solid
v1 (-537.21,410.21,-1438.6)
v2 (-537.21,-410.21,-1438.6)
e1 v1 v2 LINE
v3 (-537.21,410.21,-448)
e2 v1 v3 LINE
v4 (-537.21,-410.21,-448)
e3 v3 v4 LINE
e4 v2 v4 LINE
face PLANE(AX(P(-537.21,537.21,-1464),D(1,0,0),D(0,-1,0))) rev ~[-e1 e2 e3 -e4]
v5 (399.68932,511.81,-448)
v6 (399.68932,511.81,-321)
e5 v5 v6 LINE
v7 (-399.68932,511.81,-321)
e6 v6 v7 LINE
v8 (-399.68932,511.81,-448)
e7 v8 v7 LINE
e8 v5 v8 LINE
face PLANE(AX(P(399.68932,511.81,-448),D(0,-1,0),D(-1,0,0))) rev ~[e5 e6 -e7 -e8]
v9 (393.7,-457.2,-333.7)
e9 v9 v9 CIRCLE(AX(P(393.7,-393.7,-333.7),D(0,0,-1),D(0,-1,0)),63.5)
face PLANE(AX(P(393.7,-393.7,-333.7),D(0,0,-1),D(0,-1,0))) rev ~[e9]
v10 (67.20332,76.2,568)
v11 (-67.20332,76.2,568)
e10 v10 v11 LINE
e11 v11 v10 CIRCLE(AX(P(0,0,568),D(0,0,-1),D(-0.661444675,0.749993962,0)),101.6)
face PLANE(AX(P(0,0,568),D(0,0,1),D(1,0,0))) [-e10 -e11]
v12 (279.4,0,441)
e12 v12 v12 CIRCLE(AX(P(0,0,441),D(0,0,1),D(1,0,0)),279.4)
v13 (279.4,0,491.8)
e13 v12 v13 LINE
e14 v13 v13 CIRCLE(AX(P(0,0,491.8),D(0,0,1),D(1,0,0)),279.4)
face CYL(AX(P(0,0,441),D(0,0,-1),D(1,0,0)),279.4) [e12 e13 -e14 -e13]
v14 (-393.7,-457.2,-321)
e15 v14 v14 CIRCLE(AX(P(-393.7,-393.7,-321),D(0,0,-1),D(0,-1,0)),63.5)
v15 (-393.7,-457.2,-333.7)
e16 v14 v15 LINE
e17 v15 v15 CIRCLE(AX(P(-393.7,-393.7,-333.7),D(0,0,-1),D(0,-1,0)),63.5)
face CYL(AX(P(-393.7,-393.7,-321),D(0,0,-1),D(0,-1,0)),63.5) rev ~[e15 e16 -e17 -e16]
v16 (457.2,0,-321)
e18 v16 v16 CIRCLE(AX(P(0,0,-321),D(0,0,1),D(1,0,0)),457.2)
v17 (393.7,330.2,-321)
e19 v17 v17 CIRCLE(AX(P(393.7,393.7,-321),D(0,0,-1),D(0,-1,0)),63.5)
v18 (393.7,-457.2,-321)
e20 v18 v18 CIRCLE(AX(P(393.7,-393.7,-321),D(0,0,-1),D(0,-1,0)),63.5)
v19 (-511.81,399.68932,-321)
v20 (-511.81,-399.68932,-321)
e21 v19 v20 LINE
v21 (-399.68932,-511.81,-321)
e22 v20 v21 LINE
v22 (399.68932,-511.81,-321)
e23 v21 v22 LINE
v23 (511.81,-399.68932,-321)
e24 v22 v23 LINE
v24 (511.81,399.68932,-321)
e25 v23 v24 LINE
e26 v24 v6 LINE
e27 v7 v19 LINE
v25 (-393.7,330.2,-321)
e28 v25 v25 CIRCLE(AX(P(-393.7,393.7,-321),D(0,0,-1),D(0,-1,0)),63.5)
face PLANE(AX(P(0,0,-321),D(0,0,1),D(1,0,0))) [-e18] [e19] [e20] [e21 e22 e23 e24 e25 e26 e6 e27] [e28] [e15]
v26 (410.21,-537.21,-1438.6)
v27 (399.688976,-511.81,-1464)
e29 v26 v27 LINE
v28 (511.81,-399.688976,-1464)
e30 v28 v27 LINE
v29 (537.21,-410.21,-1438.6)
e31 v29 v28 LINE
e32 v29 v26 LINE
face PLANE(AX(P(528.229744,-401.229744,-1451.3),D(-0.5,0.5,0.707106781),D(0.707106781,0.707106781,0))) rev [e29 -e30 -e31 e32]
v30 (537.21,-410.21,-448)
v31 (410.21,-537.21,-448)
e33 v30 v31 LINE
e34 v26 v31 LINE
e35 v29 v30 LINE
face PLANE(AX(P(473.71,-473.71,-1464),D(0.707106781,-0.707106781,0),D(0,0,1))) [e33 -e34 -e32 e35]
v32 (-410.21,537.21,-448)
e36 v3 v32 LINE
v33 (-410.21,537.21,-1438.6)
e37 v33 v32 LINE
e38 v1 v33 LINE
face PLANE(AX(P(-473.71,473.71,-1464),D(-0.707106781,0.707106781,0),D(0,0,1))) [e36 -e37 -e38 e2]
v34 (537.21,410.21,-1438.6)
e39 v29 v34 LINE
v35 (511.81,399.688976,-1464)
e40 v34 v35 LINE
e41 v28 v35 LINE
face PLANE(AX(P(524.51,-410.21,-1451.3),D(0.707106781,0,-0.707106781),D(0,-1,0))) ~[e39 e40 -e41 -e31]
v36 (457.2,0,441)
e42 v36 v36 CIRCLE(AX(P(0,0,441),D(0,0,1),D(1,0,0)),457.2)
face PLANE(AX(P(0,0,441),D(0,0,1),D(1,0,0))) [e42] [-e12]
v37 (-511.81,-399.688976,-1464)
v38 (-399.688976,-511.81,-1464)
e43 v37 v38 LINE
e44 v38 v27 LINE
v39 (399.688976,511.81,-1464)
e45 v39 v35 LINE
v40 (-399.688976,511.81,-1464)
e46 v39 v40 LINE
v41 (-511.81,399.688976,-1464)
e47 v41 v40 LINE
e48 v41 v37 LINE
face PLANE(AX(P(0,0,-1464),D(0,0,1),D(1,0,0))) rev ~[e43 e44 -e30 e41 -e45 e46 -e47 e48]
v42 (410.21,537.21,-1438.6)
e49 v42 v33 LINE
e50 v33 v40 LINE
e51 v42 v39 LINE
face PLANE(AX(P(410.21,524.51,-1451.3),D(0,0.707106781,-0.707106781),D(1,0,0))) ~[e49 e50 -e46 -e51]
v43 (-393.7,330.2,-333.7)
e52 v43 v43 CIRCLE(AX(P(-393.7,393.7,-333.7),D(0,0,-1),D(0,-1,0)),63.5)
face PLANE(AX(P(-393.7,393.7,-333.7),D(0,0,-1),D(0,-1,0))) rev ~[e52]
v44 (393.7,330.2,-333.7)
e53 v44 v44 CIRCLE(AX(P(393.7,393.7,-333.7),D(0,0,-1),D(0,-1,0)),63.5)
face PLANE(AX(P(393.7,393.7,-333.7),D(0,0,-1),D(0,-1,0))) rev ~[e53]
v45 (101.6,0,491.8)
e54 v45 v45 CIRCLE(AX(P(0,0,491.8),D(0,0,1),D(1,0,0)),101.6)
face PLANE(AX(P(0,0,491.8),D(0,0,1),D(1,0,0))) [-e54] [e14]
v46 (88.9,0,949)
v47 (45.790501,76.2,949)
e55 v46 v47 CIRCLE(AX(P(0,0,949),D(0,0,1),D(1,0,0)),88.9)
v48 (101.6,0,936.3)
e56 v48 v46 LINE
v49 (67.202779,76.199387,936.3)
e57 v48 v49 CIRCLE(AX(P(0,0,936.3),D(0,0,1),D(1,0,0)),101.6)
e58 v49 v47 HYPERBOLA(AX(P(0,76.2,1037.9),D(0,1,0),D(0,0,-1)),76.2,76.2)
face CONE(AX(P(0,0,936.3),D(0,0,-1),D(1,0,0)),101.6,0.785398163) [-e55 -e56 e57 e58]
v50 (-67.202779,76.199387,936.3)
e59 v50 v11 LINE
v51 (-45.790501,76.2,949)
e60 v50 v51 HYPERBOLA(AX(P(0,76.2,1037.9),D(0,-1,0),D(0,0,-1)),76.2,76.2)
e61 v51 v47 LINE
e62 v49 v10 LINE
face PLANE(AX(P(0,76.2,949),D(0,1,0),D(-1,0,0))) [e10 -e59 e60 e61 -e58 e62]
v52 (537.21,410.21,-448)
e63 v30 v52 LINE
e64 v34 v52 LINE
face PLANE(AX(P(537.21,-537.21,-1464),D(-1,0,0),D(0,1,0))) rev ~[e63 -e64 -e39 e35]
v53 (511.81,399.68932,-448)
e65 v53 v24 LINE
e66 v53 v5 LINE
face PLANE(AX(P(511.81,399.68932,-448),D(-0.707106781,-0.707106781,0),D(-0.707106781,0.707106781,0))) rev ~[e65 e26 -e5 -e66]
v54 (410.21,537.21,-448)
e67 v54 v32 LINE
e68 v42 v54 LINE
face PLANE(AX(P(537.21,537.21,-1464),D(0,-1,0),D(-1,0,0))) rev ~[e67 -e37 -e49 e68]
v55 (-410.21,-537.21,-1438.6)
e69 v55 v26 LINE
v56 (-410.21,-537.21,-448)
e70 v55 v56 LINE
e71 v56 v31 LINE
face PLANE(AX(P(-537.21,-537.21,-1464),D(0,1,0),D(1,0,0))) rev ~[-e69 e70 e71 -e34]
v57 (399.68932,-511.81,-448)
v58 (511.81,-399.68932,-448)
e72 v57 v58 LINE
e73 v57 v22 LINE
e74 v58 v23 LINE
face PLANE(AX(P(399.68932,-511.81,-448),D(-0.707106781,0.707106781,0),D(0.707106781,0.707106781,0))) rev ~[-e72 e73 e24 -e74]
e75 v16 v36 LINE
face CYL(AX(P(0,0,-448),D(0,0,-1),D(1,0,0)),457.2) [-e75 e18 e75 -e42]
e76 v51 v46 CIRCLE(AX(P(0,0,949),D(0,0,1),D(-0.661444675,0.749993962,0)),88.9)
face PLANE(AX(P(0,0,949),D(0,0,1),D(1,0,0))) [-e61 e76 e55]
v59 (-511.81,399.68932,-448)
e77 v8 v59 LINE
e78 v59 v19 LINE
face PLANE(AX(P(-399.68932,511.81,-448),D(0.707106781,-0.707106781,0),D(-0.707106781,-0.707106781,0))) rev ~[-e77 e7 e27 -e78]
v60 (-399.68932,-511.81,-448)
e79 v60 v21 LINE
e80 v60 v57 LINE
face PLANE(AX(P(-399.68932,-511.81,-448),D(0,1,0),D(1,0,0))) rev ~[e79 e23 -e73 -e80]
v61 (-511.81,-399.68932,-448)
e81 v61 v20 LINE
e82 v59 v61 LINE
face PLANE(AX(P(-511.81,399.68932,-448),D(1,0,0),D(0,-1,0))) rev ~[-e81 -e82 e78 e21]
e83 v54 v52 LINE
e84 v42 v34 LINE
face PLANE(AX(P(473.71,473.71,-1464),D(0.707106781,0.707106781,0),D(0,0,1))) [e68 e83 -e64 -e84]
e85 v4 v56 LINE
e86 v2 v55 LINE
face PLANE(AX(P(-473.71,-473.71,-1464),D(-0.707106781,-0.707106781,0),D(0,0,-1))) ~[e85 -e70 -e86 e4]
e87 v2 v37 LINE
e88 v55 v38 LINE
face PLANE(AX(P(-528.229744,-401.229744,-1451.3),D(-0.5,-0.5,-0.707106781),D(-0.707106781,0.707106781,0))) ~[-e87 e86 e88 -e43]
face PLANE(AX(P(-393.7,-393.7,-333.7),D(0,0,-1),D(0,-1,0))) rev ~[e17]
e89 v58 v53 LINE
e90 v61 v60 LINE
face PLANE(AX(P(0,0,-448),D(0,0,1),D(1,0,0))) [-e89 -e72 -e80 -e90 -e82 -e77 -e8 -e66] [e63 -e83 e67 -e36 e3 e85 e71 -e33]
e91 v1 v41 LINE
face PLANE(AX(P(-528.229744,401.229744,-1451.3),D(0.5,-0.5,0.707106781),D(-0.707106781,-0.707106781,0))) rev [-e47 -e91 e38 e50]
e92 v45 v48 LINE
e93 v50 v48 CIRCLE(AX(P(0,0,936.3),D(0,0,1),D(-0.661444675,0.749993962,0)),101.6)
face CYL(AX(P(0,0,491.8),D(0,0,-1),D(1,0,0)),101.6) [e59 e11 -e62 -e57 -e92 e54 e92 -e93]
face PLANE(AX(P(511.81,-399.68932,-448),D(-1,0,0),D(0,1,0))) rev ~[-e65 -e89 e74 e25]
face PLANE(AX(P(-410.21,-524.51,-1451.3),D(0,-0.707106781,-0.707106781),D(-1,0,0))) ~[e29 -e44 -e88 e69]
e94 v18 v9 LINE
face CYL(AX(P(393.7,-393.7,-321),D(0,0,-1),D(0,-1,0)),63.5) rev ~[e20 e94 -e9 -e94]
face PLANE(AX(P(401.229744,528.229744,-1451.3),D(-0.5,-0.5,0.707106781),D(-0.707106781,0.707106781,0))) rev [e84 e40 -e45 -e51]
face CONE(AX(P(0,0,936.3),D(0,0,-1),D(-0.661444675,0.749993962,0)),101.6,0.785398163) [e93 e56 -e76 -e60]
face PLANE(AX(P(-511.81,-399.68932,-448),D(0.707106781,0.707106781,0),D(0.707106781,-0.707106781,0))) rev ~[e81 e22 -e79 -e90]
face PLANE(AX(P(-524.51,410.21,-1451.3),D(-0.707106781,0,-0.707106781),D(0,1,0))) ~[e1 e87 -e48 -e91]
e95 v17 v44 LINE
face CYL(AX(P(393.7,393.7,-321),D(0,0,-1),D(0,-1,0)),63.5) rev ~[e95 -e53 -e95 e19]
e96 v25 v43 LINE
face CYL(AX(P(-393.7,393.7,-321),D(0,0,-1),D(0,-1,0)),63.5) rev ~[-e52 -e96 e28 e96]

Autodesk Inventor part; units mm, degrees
ref_plane "YZ Plane" through (0, 0, 0) normal (1, 0, 0) x (0, 1, 0)
ref_plane "XZ Plane" through (0, 0, 0) normal (0, 1, 0) x (-1, 0, 0)
ref_plane "XY Plane" through (0, 0, 0) normal (0, 0, 1) x (1, 0, 0)
sketch "Sketch1" plane through (0, 0, 0) normal (0, 0, 1) x (1, 0, 0)
  line L0 (-21.15, -21.15) -> (21.15, -21.15)
  line L1 (21.15, -21.15) -> (21.15, 21.15)
  line L2 (21.15, 21.15) -> (-21.15, 21.15)
  line L3 (-21.15, 21.15) -> (-21.15, -21.15)
  line L4 (-21.15, -21.15) -> (21.15, 21.15) construction
  line L5 (21.15, -21.15) -> (-21.15, 21.15) construction
  point P0 (0, 0)
  dimension "d0" = 42.3
  dimension "d1" = 42.3
extrude "Extrusion1" add sketch "Sketch1" along normal blind 40
chamfer "Chamfer1" distance 5 angle 45 4 edges at (21.15, -21.15, 20) (-21.15, -21.15, 20) (21.15, 21.15, 20) (-21.15, 21.15, 20)
sketch "Sketch2" plane through (0, 0, 40) normal (0, 0, 1) x (1, 0, 0)
  circle A0 centre (0, 0) radius 18
  dimension "d7" = 36
extrude "Extrusion2" add sketch "Sketch2" along normal blind 35
sketch "Sketch3" plane through (0, 0, 40) normal (0, 0, 1) x (1, 0, 0)
  circle A0 centre (0, 0) radius 18 projected
  line L0 (-21.15, 16.15) -> (-16.15, 21.15) projected
  line L1 (-21.15, 16.15) -> (-21.15, -16.15) projected
  line L2 (-16.15, -21.15) -> (-21.15, -16.15) projected
  line L3 (-16.15, -21.15) -> (16.15, -21.15) projected
  line L4 (21.15, -16.15) -> (16.15, -21.15) projected
  line L5 (21.15, -16.15) -> (21.15, 16.15) projected
  line L6 (16.15, 21.15) -> (21.15, 16.15) projected
  line L7 (16.15, 21.15) -> (-16.15, 21.15) projected
  line L8 (-15.7358, 20.15) -> (-20.15, 15.7358)
  line L9 (-20.15, 15.7358) -> (-20.15, -15.7358)
  line L10 (-20.15, -15.7358) -> (-15.7358, -20.15)
  line L11 (-15.7358, -20.15) -> (15.7358, -20.15)
  line L12 (15.7358, -20.15) -> (20.15, -15.7358)
  line L13 (20.15, -15.7358) -> (20.15, 15.7358)
  line L14 (20.15, 15.7358) -> (15.7358, 20.15)
  line L15 (15.7358, 20.15) -> (-15.7358, 20.15)
  dimension "d10" = 1
extrude "Extrusion3" add sketch "Sketch3" along normal blind 5 contours L15 L14 L13 L12 L11 L10 L9 L8
sketch "Sketch4" plane through (0, 0, 45) normal (0, 0, 1) x (1, 0, 0)
  line L0 (-15.5, -15.5) -> (15.5, -15.5) construction
  line L1 (15.5, -15.5) -> (15.5, 15.5) construction
  line L2 (15.5, 15.5) -> (-15.5, 15.5) construction
  line L3 (-15.5, 15.5) -> (-15.5, -15.5) construction
  line L4 (-15.5, -15.5) -> (15.5, 15.5) construction
  line L5 (15.5, -15.5) -> (-15.5, 15.5) construction
  point P0 (0, 0)
  dimension "d13" = 31
  dimension "d14" = 31
hole "Hole1" at (-15.5, 15.5, 45) at (15.5, 15.5, 45) at (-15.5, -15.5, 45) at (15.5, -15.5, 45) direction (0, 0, -1) diameter 5 depth 0.5
sketch "Sketch5" plane through (0, 0, 75) normal (0, 0, 1) x (1, 0, 0)
  circle A0 centre (0, 0) radius 11
  dimension "d22" = 22
extrude "Extrusion4" add sketch "Sketch5" along normal blind 2
sketch "Sketch6" plane through (0, 0, 77) normal (0, 0, 1) x (1, 0, 0)
  circle A0 centre (0, 0) radius 4
  dimension "d25" = 8
extrude "Extrusion5" add sketch "Sketch6" along normal blind 18
sketch "Sketch7" plane through (0, 0, 95) normal (0, 0, 1) x (1, 0, 0)
  line L0 (-2.6458, 4) -> (2.6458, 4)
  line L1 (2.6458, 4) -> (2.6458, 3)
  line L2 (2.6458, 3) -> (-2.6458, 3)
  line L3 (-2.6458, 3) -> (-2.6458, 4)
  circle A0 centre (0, 0) radius 4 projected
  line L4 (0, 0) -> (0, 4)
  circle A1 centre (0, 0) radius 4 projected
  point P0 (0, 3)
  dimension "d28" = 7
extrude "Extrusion6" cut sketch "Sketch7" against normal blind 15 contours L0 A0 L3 | L0 L1 A0 | L4 L2 A0 | A0 L2 L4
chamfer "Chamfer2" distance 0.5 angle 45 2 edges at (3.6458, 1.6458, 95) (-1.6458, -3.6458, 95)
chamfer "Chamfer3" distance 1 angle 45 8 edges at (0, 21.15, 0) (18.65, 18.65, 0) (21.15, 0, 0) (-21.15, 0, 0) (-18.65, 18.65, 0) (18.65, -18.65, 0) (0, -21.15, 0) (-18.65, -18.65, 0)
scale "Scale1" factors (25.4, 25.4, 25.4) then translate (0, 0, -1464) bodies 1
properties part number "motor con reductora"
